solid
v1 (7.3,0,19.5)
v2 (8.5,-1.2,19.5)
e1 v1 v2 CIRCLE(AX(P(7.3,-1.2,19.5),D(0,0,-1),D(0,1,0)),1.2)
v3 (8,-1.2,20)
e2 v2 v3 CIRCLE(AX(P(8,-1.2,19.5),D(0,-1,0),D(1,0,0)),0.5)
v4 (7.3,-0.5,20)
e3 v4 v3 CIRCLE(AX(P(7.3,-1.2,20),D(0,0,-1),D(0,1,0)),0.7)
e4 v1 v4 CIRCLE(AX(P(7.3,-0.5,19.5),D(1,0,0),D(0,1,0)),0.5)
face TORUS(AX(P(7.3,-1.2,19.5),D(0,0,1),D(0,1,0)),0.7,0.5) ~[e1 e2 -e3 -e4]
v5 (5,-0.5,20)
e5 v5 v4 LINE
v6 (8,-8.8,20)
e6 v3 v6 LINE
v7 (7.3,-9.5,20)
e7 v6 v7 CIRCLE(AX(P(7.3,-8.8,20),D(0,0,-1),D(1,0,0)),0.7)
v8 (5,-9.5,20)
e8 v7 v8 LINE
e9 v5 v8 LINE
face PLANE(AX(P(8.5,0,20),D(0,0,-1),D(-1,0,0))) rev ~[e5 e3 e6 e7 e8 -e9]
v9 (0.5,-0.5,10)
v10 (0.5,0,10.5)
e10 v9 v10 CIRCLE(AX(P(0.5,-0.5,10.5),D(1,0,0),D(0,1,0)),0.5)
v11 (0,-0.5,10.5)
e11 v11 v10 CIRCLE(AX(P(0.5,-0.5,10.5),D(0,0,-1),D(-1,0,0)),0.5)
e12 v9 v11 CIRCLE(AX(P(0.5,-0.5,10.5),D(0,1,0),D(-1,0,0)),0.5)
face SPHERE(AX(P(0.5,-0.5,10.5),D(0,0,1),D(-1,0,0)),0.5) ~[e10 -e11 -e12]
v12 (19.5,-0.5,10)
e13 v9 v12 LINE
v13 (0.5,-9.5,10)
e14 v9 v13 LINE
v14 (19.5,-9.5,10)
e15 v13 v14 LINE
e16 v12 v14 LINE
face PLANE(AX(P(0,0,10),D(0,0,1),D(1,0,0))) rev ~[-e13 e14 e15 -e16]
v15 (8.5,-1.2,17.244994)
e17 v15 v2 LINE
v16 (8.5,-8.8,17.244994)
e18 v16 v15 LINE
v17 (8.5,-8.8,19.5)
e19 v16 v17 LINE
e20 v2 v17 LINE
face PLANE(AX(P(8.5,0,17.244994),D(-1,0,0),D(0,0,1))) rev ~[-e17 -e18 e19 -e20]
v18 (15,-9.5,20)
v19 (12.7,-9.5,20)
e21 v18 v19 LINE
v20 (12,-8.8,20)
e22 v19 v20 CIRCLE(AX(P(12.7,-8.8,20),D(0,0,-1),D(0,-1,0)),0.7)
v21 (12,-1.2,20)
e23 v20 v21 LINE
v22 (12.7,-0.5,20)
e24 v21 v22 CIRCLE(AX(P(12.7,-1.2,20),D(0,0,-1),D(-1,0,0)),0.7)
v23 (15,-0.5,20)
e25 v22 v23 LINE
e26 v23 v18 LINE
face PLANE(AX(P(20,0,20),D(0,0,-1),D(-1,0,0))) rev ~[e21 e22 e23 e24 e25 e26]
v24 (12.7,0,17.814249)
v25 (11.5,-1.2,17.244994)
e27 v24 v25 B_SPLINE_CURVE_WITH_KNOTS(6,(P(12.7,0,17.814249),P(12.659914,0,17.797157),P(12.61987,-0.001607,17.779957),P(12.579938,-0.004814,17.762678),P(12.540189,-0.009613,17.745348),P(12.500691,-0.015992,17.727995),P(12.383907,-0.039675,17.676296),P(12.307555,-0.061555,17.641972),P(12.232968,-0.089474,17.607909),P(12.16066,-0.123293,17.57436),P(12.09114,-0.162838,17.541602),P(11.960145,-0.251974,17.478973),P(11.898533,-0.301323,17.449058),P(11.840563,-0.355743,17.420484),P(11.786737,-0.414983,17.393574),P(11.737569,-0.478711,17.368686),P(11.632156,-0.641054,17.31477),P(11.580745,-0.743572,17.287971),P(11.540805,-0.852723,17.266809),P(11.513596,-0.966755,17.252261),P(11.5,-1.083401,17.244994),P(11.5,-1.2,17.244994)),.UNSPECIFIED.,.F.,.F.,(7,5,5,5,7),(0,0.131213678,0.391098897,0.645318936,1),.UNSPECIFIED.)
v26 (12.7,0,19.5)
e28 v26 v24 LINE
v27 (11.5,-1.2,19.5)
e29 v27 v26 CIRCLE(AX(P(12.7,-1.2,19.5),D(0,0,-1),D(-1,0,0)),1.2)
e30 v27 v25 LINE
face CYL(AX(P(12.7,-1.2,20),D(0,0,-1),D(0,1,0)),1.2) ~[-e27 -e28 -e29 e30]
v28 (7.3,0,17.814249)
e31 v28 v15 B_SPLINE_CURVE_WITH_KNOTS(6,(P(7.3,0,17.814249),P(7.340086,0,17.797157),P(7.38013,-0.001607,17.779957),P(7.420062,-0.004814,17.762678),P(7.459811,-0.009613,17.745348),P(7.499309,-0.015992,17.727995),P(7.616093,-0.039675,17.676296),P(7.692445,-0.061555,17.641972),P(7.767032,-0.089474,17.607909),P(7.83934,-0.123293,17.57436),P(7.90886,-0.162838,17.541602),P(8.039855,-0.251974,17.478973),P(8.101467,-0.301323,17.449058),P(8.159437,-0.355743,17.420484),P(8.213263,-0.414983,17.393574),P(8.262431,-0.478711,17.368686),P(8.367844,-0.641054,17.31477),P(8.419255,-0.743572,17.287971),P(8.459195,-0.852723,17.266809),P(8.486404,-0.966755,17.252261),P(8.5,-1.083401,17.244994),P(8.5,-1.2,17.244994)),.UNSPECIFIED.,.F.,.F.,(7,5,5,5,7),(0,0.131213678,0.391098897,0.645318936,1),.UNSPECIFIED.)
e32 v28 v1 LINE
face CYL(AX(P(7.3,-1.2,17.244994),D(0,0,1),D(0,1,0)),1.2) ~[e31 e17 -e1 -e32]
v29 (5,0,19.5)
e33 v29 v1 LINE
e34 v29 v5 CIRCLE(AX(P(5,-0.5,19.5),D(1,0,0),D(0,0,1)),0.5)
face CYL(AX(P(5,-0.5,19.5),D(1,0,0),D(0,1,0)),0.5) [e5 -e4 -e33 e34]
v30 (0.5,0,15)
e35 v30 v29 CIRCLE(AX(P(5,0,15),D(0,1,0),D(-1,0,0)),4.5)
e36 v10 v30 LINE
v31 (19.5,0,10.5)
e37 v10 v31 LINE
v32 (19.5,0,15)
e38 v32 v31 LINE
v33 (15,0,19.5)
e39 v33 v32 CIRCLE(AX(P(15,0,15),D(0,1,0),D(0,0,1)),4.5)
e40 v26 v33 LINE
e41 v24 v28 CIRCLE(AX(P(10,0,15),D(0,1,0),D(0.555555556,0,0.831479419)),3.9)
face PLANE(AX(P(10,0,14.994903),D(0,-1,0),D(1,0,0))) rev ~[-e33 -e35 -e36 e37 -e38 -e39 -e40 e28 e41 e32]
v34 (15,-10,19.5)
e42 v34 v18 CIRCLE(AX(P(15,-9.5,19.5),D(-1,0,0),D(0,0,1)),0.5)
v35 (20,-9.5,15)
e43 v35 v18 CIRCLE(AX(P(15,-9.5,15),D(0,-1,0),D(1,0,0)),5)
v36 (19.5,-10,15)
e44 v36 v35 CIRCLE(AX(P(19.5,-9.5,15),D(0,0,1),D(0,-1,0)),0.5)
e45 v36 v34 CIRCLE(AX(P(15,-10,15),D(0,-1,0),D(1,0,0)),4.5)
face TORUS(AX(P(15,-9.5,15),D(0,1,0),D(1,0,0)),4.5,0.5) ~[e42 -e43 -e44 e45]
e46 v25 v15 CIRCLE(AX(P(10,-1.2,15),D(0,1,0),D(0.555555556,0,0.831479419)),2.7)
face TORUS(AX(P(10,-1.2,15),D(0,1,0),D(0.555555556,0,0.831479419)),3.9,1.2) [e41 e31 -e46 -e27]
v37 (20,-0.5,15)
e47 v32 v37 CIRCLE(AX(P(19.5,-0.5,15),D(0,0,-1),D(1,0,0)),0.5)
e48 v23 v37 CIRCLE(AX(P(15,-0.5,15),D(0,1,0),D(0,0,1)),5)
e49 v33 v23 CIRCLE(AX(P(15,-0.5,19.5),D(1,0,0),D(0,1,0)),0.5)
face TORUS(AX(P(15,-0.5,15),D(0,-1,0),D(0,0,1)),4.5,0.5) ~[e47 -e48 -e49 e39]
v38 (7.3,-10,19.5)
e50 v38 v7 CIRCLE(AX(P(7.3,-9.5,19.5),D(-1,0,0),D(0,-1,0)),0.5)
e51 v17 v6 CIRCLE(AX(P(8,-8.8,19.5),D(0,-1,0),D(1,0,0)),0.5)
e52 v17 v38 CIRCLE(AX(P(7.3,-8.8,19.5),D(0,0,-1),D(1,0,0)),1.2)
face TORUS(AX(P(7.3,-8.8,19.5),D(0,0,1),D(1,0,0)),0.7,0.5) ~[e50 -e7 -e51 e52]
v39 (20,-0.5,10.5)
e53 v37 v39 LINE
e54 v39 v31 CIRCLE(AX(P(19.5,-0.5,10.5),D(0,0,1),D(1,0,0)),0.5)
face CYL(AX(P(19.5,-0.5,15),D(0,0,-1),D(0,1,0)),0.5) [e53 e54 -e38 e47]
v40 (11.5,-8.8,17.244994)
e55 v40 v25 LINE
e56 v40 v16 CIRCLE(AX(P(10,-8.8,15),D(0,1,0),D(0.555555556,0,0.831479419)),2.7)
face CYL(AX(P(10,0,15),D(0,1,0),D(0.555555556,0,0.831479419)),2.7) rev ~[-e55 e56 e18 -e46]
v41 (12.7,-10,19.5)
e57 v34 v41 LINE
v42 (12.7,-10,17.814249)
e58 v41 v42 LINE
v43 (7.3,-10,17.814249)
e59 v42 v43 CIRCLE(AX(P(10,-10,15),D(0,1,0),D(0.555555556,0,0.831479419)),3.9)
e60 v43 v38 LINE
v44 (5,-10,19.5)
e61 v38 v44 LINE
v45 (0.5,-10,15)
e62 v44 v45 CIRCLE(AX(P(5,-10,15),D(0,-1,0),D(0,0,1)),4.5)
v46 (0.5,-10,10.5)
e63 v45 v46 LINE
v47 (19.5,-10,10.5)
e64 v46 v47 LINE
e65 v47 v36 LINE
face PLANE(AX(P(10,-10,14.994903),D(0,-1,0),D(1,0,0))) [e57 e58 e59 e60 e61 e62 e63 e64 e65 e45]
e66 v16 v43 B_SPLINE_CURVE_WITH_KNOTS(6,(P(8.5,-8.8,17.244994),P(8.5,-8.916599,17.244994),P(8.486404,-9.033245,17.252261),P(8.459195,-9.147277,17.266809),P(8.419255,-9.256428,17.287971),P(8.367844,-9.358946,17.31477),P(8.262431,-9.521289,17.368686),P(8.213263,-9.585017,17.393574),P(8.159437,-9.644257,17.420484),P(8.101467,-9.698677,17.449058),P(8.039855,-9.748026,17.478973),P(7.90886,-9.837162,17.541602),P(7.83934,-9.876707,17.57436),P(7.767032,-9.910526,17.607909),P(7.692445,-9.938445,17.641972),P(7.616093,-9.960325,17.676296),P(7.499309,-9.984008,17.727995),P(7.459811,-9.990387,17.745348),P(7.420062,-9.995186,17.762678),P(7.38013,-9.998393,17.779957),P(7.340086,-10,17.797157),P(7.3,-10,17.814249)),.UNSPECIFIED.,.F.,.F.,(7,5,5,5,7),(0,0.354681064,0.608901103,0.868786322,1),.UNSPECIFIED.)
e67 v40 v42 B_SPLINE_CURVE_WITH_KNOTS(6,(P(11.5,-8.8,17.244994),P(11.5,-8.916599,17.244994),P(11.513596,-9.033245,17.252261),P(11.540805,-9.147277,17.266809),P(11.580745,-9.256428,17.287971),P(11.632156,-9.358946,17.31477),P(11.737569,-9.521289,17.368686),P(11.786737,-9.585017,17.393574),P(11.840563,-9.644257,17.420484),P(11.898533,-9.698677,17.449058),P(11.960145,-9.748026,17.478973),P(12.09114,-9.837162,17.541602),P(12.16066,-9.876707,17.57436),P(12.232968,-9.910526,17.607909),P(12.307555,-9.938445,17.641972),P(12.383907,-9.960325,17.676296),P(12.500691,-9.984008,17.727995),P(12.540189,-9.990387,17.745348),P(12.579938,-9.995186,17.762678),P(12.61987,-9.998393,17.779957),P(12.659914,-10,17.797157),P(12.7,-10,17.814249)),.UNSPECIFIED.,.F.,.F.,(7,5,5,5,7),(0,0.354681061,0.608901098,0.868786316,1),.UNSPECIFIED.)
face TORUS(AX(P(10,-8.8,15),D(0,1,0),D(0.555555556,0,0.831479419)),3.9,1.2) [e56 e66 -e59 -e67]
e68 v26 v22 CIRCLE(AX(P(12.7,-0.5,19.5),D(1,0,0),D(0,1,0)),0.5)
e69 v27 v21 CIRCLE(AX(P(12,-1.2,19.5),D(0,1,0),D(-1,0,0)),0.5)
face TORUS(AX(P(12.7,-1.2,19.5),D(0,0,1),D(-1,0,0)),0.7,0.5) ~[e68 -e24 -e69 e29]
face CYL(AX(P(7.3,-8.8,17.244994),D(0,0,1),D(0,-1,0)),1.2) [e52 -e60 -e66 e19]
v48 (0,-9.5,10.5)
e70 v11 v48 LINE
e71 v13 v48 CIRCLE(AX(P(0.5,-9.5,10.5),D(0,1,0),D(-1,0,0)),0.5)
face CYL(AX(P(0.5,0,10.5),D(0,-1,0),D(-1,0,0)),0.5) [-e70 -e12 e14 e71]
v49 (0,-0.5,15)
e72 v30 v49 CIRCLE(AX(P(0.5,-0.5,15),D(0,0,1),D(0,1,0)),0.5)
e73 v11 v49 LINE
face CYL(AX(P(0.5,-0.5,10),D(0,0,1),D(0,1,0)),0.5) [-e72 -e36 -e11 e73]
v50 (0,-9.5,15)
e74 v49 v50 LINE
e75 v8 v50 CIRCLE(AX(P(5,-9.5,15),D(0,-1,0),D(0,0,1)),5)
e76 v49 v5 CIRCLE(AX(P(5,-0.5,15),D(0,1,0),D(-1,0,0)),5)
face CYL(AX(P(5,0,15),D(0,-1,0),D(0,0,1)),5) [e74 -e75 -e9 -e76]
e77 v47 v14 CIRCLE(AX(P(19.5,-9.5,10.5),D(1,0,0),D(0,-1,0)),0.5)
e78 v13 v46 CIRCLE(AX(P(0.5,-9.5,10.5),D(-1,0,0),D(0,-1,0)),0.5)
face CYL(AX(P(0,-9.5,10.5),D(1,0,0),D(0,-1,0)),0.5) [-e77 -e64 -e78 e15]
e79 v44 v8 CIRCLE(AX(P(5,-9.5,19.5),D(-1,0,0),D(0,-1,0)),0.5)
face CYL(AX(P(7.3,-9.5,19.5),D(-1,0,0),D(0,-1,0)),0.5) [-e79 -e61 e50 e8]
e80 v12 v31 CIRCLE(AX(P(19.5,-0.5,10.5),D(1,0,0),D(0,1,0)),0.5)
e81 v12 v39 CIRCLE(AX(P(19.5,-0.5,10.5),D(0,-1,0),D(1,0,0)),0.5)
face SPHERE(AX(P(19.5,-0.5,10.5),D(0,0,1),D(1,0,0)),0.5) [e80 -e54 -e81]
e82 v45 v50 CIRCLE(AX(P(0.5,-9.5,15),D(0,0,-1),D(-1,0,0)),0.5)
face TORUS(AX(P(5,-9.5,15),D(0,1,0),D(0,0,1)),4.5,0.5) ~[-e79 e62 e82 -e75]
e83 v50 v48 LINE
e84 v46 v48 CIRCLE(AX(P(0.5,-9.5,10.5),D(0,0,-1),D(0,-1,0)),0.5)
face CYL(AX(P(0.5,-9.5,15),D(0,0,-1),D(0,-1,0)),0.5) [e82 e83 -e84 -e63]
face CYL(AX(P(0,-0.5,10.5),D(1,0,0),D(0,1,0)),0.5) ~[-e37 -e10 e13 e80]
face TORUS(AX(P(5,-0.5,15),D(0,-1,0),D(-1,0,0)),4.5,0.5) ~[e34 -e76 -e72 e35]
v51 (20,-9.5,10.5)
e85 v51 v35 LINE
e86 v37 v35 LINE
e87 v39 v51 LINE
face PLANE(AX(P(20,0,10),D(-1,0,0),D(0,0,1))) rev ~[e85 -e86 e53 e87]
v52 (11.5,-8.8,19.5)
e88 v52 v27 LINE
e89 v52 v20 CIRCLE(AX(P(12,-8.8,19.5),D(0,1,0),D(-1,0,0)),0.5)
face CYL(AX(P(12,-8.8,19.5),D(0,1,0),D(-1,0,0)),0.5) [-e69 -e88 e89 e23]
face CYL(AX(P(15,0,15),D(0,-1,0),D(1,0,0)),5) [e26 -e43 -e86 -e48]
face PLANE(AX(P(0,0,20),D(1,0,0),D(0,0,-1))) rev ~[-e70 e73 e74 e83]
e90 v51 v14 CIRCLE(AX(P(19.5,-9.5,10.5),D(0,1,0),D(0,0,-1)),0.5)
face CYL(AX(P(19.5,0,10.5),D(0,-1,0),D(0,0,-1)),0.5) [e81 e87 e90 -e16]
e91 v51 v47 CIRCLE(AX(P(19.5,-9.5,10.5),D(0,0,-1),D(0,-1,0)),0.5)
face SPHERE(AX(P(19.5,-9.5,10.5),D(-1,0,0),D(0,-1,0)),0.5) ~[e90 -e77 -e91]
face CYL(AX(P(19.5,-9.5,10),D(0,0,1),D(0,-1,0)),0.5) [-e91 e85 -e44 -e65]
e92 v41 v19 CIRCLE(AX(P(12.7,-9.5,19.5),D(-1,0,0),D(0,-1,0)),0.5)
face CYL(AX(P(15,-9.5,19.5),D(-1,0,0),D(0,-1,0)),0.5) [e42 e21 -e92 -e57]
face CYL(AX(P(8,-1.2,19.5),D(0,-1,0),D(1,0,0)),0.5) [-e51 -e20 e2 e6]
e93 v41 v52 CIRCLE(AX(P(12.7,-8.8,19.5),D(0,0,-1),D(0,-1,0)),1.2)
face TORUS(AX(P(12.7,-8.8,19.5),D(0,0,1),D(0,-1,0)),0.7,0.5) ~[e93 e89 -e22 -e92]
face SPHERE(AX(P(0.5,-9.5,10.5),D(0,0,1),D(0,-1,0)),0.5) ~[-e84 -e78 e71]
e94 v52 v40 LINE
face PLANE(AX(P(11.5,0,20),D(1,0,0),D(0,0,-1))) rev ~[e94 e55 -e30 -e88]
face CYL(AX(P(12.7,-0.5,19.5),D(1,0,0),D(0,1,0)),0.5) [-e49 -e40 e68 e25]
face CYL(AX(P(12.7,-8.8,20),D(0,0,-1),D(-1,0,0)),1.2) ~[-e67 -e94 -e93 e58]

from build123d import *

# Parameters (mm, degrees)
F2_DEPTH = 0.8
F3_DEPTH = 10
F4_R     = 1.2
F5_R     = 5
F6_R     = 0.5


# Not quite as in the source:
# - a feature names something its author has since deleted; it is built from what else it names


with BuildPart() as f2:
    # F1 (on Front) → F2 (new body)
    with BuildSketch(Plane.XZ):
        with BuildLine():
            Line((8.5, 20), (0, 20))
            Line((0, 20), (0, 10))
            Line((0, 10), (20, 10))
            Line((20, 10), (20, 20))
            Line((20, 20), (11.5, 20))
            Line((11.5, 20), (11.5, 17.2449944321))
            ThreePointArc((11.5, 17.2449944321), (10, 12.3), (8.5, 17.2449944321))
            Line((8.5, 17.2449944321), (8.5, 20))
        make_face()
    extrude(amount=F2_DEPTH)

    # F1 (on Front) → F3 (join)
    with BuildSketch(Plane.XZ):
        with BuildLine():
            Line((8.5, 20), (0, 20))
            Line((0, 20), (0, 10))
            Line((0, 10), (20, 10))
            Line((20, 10), (20, 20))
            Line((20, 20), (11.5, 20))
            Line((11.5, 20), (11.5, 17.2449944321))
            ThreePointArc((11.5, 17.2449944321), (10, 12.3), (8.5, 17.2449944321))
            Line((8.5, 17.2449944321), (8.5, 20))
        make_face()
    extrude(amount=F3_DEPTH)

    # F4
    f4_edges = [f2.edges().sort_by_distance(p)[0] for p in [
        (10, -10, 12.3),
        (8.5, -10, 18.622497),
        (11.5, -10, 18.622497),
        (10, 0, 12.3),
        (8.5, 0, 18.622497),
        (11.5, 0, 18.622497),
    ]]
    fillet(f4_edges, radius=F4_R)

    # F5
    f5_edges = [f2.edges().sort_by_distance(p)[0] for p in [
        (20, -5, 20),
        (0, -5, 20),
    ]]
    fillet(f5_edges, radius=F5_R)

    # F6
    f6_edges = [f2.edges().sort_by_distance(p)[0] for p in [
        (1.464466, -10, 18.535534),
        (0, -10, 12.5),
        (10, -10, 10),
        (18.535534, -10, 18.535534),
        (18.535534, 0, 18.535534),
        (1.464466, 0, 18.535534),
        (20, -5, 10),
        (0, -5, 10),
        (10, 0, 10),
    ]]
    fillet(f6_edges, radius=F6_R)


solid = f2.part
